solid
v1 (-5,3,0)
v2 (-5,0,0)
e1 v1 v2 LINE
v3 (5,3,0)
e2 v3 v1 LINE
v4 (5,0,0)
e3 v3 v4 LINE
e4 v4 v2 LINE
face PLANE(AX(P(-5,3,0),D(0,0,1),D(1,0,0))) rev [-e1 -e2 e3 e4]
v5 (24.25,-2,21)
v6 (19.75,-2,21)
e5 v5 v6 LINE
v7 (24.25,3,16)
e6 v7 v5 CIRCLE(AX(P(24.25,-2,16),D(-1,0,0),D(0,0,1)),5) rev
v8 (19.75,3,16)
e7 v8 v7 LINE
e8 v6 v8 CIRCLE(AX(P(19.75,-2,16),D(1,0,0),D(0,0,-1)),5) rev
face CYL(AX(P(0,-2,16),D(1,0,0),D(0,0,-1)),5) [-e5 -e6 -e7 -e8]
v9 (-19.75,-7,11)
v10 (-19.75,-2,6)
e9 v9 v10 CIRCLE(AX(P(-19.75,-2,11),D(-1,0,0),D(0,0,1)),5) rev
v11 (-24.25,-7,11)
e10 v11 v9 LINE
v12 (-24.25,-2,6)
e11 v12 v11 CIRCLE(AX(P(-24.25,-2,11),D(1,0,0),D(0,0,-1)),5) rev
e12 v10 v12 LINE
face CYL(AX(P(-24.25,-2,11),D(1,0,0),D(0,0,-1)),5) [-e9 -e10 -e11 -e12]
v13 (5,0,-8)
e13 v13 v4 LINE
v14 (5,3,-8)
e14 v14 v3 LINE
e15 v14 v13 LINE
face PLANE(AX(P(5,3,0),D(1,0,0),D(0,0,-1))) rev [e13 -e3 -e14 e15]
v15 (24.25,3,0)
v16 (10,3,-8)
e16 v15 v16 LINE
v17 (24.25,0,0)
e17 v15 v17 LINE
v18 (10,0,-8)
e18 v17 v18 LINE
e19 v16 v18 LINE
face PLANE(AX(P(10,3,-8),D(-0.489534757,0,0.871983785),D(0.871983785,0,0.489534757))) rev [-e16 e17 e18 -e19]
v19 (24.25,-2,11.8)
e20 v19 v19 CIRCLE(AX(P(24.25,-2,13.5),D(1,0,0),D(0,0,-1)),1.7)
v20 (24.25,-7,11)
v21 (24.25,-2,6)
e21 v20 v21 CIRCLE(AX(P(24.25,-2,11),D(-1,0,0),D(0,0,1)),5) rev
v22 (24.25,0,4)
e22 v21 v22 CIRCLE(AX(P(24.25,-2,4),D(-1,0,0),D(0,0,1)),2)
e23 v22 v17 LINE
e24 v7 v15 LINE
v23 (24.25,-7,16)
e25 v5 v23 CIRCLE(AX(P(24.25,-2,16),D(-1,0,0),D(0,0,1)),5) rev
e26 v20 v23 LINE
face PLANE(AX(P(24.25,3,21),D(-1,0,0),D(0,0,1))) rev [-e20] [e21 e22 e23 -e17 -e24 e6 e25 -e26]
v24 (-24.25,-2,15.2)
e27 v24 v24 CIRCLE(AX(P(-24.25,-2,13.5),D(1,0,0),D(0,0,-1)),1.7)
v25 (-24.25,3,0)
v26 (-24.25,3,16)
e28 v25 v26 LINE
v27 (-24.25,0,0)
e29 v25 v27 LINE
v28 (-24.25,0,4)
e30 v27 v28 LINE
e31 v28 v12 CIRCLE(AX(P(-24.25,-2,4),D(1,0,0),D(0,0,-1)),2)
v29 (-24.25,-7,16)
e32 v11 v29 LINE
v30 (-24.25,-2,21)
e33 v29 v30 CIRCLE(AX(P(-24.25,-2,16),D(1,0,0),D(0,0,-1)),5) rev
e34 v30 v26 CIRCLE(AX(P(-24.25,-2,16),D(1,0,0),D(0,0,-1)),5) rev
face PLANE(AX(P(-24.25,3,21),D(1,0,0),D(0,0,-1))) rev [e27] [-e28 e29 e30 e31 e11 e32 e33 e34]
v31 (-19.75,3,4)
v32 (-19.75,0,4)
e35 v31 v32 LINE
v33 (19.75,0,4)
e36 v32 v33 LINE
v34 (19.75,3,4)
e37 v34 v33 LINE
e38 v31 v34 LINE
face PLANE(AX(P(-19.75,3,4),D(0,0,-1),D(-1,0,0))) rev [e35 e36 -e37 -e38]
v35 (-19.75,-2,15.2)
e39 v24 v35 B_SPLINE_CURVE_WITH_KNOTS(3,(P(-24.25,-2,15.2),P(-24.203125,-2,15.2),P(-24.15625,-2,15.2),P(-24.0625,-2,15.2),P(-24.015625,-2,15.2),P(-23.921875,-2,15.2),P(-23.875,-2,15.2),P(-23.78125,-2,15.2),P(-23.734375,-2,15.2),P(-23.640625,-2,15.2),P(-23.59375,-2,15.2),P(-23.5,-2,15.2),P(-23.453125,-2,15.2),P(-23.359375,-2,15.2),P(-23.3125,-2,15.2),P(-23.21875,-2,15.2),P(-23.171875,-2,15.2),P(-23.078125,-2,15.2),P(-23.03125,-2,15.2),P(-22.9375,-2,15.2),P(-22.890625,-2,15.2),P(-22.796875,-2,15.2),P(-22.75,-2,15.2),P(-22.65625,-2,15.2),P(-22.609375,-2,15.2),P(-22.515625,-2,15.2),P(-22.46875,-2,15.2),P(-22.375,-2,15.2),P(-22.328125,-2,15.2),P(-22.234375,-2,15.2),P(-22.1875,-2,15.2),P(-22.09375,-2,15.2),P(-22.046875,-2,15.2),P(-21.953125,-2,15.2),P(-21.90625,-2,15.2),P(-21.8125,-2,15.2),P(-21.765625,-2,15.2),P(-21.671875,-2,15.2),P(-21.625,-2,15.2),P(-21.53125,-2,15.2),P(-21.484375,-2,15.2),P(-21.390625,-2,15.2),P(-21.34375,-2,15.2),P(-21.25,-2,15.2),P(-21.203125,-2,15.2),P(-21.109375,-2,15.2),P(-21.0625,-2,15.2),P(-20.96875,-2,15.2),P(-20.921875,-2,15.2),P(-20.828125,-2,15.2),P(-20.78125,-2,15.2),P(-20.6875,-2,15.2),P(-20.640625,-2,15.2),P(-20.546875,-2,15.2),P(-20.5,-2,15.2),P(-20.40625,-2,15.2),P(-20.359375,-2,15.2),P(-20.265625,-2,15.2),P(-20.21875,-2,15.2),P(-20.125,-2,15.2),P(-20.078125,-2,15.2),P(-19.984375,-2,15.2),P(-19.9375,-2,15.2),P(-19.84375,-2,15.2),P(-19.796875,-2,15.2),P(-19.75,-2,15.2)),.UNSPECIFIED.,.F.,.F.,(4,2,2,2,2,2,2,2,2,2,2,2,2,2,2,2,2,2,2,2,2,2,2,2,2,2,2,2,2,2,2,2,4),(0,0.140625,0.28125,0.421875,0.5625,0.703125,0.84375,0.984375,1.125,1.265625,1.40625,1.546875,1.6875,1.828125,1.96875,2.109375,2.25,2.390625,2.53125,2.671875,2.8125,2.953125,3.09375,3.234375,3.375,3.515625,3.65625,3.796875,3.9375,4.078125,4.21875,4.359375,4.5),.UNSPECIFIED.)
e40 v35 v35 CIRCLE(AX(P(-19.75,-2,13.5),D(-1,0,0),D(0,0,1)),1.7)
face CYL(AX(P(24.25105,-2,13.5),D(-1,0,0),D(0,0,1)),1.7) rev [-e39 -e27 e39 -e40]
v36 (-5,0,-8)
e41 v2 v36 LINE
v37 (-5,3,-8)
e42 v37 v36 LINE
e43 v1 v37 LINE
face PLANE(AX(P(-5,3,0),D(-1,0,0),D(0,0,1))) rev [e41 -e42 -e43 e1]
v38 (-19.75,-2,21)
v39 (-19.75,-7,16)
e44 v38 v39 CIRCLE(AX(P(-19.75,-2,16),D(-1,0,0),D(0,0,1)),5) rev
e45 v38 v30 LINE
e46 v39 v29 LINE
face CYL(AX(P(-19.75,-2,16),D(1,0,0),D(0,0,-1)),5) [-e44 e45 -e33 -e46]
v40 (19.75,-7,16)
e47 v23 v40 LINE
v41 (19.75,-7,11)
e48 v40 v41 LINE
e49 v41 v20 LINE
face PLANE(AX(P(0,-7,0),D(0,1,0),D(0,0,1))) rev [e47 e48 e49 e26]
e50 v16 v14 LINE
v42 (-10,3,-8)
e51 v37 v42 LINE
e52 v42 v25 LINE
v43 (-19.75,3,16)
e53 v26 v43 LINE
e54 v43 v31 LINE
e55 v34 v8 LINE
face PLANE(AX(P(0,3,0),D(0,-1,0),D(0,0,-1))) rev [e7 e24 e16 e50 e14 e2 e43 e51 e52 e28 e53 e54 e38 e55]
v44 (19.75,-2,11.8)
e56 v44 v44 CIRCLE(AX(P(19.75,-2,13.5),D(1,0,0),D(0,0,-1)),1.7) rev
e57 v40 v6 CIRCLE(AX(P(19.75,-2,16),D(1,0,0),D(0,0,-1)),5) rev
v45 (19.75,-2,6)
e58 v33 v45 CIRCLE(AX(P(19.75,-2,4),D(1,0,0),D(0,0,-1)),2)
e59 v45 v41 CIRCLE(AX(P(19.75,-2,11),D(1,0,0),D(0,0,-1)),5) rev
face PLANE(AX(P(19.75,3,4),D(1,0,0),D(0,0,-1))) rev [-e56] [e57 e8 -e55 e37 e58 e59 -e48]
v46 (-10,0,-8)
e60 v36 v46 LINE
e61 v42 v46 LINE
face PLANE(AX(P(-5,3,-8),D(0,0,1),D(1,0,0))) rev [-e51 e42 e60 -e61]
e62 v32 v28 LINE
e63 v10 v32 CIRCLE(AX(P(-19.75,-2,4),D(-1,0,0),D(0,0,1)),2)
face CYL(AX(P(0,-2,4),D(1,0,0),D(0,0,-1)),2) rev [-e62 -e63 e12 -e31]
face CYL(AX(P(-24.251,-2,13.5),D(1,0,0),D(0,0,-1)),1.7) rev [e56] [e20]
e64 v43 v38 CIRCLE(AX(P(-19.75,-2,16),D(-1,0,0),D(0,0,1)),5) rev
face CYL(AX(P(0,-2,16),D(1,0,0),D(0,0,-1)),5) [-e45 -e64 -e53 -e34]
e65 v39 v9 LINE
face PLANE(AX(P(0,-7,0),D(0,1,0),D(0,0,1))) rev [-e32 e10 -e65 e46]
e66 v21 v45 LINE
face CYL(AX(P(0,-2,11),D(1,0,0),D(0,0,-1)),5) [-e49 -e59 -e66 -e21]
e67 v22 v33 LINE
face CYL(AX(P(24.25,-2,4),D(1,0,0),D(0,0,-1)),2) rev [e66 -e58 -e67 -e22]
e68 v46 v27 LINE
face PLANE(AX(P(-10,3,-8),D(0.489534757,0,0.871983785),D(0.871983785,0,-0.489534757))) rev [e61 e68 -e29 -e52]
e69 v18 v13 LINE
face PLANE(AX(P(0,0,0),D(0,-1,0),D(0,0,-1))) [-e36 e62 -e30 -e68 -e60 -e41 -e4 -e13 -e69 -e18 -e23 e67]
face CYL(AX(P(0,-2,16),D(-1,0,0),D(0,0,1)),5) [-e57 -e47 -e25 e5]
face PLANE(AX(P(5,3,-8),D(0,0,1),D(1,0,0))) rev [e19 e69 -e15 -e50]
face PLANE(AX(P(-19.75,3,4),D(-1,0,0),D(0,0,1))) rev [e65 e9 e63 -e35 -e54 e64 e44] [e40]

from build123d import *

# Parameters (mm, degrees)
BOSS_EXTRUDE1_DEPTH = 3
SKETCH3_W           = 4.5
SKETCH3_H           = 15
BOSS_EXTRUDE3_DEPTH = 7
CUT_EXTRUDE1_REACH  = 55.313
SKETCH4_R           = 1.7
FILLET2_R           = 5
FILLET3_R           = 2


with BuildPart() as part:
    # Sketch1 → Boss-Extrude1 (new body)
    with BuildSketch(Plane(origin=(0, 0, 0), x_dir=(1, 0, 0), z_dir=(0, 1, 0))):
        Polygon((-5, 0), (5, 0), (5, 8), (10, 8), (24.25, 0), (24.25, -21), (19.75, -21), (19.75, -4), (-19.75, -4), (-19.75, -21), (-24.25, -21), (-24.25, 0), (-10, 8), (-5, 8), align=None)
    extrude(amount=BOSS_EXTRUDE1_DEPTH)

    # Sketch3 → Boss-Extrude3 (add)
    with BuildSketch(Plane.XZ):
        with Locations((22, 13.5)):
            Rectangle(SKETCH3_W, SKETCH3_H)
    boss_extrude3 = extrude(amount=BOSS_EXTRUDE3_DEPTH)

    # Sketch4 → Cut-Extrude1 (cut, up to next)
    with BuildSketch(Plane(origin=(24.25, 0, 0), x_dir=(0, 0, -1), z_dir=(1, 0, 0)), mode=Mode.PRIVATE) as cut_extrude1_sk1:
        with Locations((-13.5, -2)):
            Circle(SKETCH4_R)
    cut_extrude1_tool1 = extrude(cut_extrude1_sk1.sketch, amount=-CUT_EXTRUDE1_REACH, mode=Mode.PRIVATE) & part.part
    cut_extrude1 = cut_extrude1_tool1.solids().sort_by_distance((24.25, -2, 13.5))[0]
    add(cut_extrude1, mode=Mode.SUBTRACT)

    # Mirror2: Boss-Extrude3, Cut-Extrude1 across plane
    add(boss_extrude3.mirror(Plane(origin=(0, 0, 0), x_dir=(0, 0, 1), z_dir=(1, 0, 0))))
    add(cut_extrude1.mirror(Plane(origin=(0, 0, 0), x_dir=(0, 0, 1), z_dir=(1, 0, 0))), mode=Mode.SUBTRACT)

    # Fillet2
    fillet2_edges = [part.edges().sort_by_distance(p)[0] for p in [
        (22, -7, 6),
        (22, -7, 21),
        (22, 3, 21),
        (-22, -7, 6),
        (-22, -7, 21),
        (-22, 3, 21),
    ]]
    fillet(fillet2_edges, radius=FILLET2_R - 0.0001)  # a hair under: the kernel refuses the full size

    # Fillet3
    fillet3_edges = [part.edges().sort_by_distance(p)[0] for p in [
        (22, 0, 6),
        (-22, 0, 6),
    ]]
    fillet(fillet3_edges, radius=FILLET3_R)


solid = part.part
